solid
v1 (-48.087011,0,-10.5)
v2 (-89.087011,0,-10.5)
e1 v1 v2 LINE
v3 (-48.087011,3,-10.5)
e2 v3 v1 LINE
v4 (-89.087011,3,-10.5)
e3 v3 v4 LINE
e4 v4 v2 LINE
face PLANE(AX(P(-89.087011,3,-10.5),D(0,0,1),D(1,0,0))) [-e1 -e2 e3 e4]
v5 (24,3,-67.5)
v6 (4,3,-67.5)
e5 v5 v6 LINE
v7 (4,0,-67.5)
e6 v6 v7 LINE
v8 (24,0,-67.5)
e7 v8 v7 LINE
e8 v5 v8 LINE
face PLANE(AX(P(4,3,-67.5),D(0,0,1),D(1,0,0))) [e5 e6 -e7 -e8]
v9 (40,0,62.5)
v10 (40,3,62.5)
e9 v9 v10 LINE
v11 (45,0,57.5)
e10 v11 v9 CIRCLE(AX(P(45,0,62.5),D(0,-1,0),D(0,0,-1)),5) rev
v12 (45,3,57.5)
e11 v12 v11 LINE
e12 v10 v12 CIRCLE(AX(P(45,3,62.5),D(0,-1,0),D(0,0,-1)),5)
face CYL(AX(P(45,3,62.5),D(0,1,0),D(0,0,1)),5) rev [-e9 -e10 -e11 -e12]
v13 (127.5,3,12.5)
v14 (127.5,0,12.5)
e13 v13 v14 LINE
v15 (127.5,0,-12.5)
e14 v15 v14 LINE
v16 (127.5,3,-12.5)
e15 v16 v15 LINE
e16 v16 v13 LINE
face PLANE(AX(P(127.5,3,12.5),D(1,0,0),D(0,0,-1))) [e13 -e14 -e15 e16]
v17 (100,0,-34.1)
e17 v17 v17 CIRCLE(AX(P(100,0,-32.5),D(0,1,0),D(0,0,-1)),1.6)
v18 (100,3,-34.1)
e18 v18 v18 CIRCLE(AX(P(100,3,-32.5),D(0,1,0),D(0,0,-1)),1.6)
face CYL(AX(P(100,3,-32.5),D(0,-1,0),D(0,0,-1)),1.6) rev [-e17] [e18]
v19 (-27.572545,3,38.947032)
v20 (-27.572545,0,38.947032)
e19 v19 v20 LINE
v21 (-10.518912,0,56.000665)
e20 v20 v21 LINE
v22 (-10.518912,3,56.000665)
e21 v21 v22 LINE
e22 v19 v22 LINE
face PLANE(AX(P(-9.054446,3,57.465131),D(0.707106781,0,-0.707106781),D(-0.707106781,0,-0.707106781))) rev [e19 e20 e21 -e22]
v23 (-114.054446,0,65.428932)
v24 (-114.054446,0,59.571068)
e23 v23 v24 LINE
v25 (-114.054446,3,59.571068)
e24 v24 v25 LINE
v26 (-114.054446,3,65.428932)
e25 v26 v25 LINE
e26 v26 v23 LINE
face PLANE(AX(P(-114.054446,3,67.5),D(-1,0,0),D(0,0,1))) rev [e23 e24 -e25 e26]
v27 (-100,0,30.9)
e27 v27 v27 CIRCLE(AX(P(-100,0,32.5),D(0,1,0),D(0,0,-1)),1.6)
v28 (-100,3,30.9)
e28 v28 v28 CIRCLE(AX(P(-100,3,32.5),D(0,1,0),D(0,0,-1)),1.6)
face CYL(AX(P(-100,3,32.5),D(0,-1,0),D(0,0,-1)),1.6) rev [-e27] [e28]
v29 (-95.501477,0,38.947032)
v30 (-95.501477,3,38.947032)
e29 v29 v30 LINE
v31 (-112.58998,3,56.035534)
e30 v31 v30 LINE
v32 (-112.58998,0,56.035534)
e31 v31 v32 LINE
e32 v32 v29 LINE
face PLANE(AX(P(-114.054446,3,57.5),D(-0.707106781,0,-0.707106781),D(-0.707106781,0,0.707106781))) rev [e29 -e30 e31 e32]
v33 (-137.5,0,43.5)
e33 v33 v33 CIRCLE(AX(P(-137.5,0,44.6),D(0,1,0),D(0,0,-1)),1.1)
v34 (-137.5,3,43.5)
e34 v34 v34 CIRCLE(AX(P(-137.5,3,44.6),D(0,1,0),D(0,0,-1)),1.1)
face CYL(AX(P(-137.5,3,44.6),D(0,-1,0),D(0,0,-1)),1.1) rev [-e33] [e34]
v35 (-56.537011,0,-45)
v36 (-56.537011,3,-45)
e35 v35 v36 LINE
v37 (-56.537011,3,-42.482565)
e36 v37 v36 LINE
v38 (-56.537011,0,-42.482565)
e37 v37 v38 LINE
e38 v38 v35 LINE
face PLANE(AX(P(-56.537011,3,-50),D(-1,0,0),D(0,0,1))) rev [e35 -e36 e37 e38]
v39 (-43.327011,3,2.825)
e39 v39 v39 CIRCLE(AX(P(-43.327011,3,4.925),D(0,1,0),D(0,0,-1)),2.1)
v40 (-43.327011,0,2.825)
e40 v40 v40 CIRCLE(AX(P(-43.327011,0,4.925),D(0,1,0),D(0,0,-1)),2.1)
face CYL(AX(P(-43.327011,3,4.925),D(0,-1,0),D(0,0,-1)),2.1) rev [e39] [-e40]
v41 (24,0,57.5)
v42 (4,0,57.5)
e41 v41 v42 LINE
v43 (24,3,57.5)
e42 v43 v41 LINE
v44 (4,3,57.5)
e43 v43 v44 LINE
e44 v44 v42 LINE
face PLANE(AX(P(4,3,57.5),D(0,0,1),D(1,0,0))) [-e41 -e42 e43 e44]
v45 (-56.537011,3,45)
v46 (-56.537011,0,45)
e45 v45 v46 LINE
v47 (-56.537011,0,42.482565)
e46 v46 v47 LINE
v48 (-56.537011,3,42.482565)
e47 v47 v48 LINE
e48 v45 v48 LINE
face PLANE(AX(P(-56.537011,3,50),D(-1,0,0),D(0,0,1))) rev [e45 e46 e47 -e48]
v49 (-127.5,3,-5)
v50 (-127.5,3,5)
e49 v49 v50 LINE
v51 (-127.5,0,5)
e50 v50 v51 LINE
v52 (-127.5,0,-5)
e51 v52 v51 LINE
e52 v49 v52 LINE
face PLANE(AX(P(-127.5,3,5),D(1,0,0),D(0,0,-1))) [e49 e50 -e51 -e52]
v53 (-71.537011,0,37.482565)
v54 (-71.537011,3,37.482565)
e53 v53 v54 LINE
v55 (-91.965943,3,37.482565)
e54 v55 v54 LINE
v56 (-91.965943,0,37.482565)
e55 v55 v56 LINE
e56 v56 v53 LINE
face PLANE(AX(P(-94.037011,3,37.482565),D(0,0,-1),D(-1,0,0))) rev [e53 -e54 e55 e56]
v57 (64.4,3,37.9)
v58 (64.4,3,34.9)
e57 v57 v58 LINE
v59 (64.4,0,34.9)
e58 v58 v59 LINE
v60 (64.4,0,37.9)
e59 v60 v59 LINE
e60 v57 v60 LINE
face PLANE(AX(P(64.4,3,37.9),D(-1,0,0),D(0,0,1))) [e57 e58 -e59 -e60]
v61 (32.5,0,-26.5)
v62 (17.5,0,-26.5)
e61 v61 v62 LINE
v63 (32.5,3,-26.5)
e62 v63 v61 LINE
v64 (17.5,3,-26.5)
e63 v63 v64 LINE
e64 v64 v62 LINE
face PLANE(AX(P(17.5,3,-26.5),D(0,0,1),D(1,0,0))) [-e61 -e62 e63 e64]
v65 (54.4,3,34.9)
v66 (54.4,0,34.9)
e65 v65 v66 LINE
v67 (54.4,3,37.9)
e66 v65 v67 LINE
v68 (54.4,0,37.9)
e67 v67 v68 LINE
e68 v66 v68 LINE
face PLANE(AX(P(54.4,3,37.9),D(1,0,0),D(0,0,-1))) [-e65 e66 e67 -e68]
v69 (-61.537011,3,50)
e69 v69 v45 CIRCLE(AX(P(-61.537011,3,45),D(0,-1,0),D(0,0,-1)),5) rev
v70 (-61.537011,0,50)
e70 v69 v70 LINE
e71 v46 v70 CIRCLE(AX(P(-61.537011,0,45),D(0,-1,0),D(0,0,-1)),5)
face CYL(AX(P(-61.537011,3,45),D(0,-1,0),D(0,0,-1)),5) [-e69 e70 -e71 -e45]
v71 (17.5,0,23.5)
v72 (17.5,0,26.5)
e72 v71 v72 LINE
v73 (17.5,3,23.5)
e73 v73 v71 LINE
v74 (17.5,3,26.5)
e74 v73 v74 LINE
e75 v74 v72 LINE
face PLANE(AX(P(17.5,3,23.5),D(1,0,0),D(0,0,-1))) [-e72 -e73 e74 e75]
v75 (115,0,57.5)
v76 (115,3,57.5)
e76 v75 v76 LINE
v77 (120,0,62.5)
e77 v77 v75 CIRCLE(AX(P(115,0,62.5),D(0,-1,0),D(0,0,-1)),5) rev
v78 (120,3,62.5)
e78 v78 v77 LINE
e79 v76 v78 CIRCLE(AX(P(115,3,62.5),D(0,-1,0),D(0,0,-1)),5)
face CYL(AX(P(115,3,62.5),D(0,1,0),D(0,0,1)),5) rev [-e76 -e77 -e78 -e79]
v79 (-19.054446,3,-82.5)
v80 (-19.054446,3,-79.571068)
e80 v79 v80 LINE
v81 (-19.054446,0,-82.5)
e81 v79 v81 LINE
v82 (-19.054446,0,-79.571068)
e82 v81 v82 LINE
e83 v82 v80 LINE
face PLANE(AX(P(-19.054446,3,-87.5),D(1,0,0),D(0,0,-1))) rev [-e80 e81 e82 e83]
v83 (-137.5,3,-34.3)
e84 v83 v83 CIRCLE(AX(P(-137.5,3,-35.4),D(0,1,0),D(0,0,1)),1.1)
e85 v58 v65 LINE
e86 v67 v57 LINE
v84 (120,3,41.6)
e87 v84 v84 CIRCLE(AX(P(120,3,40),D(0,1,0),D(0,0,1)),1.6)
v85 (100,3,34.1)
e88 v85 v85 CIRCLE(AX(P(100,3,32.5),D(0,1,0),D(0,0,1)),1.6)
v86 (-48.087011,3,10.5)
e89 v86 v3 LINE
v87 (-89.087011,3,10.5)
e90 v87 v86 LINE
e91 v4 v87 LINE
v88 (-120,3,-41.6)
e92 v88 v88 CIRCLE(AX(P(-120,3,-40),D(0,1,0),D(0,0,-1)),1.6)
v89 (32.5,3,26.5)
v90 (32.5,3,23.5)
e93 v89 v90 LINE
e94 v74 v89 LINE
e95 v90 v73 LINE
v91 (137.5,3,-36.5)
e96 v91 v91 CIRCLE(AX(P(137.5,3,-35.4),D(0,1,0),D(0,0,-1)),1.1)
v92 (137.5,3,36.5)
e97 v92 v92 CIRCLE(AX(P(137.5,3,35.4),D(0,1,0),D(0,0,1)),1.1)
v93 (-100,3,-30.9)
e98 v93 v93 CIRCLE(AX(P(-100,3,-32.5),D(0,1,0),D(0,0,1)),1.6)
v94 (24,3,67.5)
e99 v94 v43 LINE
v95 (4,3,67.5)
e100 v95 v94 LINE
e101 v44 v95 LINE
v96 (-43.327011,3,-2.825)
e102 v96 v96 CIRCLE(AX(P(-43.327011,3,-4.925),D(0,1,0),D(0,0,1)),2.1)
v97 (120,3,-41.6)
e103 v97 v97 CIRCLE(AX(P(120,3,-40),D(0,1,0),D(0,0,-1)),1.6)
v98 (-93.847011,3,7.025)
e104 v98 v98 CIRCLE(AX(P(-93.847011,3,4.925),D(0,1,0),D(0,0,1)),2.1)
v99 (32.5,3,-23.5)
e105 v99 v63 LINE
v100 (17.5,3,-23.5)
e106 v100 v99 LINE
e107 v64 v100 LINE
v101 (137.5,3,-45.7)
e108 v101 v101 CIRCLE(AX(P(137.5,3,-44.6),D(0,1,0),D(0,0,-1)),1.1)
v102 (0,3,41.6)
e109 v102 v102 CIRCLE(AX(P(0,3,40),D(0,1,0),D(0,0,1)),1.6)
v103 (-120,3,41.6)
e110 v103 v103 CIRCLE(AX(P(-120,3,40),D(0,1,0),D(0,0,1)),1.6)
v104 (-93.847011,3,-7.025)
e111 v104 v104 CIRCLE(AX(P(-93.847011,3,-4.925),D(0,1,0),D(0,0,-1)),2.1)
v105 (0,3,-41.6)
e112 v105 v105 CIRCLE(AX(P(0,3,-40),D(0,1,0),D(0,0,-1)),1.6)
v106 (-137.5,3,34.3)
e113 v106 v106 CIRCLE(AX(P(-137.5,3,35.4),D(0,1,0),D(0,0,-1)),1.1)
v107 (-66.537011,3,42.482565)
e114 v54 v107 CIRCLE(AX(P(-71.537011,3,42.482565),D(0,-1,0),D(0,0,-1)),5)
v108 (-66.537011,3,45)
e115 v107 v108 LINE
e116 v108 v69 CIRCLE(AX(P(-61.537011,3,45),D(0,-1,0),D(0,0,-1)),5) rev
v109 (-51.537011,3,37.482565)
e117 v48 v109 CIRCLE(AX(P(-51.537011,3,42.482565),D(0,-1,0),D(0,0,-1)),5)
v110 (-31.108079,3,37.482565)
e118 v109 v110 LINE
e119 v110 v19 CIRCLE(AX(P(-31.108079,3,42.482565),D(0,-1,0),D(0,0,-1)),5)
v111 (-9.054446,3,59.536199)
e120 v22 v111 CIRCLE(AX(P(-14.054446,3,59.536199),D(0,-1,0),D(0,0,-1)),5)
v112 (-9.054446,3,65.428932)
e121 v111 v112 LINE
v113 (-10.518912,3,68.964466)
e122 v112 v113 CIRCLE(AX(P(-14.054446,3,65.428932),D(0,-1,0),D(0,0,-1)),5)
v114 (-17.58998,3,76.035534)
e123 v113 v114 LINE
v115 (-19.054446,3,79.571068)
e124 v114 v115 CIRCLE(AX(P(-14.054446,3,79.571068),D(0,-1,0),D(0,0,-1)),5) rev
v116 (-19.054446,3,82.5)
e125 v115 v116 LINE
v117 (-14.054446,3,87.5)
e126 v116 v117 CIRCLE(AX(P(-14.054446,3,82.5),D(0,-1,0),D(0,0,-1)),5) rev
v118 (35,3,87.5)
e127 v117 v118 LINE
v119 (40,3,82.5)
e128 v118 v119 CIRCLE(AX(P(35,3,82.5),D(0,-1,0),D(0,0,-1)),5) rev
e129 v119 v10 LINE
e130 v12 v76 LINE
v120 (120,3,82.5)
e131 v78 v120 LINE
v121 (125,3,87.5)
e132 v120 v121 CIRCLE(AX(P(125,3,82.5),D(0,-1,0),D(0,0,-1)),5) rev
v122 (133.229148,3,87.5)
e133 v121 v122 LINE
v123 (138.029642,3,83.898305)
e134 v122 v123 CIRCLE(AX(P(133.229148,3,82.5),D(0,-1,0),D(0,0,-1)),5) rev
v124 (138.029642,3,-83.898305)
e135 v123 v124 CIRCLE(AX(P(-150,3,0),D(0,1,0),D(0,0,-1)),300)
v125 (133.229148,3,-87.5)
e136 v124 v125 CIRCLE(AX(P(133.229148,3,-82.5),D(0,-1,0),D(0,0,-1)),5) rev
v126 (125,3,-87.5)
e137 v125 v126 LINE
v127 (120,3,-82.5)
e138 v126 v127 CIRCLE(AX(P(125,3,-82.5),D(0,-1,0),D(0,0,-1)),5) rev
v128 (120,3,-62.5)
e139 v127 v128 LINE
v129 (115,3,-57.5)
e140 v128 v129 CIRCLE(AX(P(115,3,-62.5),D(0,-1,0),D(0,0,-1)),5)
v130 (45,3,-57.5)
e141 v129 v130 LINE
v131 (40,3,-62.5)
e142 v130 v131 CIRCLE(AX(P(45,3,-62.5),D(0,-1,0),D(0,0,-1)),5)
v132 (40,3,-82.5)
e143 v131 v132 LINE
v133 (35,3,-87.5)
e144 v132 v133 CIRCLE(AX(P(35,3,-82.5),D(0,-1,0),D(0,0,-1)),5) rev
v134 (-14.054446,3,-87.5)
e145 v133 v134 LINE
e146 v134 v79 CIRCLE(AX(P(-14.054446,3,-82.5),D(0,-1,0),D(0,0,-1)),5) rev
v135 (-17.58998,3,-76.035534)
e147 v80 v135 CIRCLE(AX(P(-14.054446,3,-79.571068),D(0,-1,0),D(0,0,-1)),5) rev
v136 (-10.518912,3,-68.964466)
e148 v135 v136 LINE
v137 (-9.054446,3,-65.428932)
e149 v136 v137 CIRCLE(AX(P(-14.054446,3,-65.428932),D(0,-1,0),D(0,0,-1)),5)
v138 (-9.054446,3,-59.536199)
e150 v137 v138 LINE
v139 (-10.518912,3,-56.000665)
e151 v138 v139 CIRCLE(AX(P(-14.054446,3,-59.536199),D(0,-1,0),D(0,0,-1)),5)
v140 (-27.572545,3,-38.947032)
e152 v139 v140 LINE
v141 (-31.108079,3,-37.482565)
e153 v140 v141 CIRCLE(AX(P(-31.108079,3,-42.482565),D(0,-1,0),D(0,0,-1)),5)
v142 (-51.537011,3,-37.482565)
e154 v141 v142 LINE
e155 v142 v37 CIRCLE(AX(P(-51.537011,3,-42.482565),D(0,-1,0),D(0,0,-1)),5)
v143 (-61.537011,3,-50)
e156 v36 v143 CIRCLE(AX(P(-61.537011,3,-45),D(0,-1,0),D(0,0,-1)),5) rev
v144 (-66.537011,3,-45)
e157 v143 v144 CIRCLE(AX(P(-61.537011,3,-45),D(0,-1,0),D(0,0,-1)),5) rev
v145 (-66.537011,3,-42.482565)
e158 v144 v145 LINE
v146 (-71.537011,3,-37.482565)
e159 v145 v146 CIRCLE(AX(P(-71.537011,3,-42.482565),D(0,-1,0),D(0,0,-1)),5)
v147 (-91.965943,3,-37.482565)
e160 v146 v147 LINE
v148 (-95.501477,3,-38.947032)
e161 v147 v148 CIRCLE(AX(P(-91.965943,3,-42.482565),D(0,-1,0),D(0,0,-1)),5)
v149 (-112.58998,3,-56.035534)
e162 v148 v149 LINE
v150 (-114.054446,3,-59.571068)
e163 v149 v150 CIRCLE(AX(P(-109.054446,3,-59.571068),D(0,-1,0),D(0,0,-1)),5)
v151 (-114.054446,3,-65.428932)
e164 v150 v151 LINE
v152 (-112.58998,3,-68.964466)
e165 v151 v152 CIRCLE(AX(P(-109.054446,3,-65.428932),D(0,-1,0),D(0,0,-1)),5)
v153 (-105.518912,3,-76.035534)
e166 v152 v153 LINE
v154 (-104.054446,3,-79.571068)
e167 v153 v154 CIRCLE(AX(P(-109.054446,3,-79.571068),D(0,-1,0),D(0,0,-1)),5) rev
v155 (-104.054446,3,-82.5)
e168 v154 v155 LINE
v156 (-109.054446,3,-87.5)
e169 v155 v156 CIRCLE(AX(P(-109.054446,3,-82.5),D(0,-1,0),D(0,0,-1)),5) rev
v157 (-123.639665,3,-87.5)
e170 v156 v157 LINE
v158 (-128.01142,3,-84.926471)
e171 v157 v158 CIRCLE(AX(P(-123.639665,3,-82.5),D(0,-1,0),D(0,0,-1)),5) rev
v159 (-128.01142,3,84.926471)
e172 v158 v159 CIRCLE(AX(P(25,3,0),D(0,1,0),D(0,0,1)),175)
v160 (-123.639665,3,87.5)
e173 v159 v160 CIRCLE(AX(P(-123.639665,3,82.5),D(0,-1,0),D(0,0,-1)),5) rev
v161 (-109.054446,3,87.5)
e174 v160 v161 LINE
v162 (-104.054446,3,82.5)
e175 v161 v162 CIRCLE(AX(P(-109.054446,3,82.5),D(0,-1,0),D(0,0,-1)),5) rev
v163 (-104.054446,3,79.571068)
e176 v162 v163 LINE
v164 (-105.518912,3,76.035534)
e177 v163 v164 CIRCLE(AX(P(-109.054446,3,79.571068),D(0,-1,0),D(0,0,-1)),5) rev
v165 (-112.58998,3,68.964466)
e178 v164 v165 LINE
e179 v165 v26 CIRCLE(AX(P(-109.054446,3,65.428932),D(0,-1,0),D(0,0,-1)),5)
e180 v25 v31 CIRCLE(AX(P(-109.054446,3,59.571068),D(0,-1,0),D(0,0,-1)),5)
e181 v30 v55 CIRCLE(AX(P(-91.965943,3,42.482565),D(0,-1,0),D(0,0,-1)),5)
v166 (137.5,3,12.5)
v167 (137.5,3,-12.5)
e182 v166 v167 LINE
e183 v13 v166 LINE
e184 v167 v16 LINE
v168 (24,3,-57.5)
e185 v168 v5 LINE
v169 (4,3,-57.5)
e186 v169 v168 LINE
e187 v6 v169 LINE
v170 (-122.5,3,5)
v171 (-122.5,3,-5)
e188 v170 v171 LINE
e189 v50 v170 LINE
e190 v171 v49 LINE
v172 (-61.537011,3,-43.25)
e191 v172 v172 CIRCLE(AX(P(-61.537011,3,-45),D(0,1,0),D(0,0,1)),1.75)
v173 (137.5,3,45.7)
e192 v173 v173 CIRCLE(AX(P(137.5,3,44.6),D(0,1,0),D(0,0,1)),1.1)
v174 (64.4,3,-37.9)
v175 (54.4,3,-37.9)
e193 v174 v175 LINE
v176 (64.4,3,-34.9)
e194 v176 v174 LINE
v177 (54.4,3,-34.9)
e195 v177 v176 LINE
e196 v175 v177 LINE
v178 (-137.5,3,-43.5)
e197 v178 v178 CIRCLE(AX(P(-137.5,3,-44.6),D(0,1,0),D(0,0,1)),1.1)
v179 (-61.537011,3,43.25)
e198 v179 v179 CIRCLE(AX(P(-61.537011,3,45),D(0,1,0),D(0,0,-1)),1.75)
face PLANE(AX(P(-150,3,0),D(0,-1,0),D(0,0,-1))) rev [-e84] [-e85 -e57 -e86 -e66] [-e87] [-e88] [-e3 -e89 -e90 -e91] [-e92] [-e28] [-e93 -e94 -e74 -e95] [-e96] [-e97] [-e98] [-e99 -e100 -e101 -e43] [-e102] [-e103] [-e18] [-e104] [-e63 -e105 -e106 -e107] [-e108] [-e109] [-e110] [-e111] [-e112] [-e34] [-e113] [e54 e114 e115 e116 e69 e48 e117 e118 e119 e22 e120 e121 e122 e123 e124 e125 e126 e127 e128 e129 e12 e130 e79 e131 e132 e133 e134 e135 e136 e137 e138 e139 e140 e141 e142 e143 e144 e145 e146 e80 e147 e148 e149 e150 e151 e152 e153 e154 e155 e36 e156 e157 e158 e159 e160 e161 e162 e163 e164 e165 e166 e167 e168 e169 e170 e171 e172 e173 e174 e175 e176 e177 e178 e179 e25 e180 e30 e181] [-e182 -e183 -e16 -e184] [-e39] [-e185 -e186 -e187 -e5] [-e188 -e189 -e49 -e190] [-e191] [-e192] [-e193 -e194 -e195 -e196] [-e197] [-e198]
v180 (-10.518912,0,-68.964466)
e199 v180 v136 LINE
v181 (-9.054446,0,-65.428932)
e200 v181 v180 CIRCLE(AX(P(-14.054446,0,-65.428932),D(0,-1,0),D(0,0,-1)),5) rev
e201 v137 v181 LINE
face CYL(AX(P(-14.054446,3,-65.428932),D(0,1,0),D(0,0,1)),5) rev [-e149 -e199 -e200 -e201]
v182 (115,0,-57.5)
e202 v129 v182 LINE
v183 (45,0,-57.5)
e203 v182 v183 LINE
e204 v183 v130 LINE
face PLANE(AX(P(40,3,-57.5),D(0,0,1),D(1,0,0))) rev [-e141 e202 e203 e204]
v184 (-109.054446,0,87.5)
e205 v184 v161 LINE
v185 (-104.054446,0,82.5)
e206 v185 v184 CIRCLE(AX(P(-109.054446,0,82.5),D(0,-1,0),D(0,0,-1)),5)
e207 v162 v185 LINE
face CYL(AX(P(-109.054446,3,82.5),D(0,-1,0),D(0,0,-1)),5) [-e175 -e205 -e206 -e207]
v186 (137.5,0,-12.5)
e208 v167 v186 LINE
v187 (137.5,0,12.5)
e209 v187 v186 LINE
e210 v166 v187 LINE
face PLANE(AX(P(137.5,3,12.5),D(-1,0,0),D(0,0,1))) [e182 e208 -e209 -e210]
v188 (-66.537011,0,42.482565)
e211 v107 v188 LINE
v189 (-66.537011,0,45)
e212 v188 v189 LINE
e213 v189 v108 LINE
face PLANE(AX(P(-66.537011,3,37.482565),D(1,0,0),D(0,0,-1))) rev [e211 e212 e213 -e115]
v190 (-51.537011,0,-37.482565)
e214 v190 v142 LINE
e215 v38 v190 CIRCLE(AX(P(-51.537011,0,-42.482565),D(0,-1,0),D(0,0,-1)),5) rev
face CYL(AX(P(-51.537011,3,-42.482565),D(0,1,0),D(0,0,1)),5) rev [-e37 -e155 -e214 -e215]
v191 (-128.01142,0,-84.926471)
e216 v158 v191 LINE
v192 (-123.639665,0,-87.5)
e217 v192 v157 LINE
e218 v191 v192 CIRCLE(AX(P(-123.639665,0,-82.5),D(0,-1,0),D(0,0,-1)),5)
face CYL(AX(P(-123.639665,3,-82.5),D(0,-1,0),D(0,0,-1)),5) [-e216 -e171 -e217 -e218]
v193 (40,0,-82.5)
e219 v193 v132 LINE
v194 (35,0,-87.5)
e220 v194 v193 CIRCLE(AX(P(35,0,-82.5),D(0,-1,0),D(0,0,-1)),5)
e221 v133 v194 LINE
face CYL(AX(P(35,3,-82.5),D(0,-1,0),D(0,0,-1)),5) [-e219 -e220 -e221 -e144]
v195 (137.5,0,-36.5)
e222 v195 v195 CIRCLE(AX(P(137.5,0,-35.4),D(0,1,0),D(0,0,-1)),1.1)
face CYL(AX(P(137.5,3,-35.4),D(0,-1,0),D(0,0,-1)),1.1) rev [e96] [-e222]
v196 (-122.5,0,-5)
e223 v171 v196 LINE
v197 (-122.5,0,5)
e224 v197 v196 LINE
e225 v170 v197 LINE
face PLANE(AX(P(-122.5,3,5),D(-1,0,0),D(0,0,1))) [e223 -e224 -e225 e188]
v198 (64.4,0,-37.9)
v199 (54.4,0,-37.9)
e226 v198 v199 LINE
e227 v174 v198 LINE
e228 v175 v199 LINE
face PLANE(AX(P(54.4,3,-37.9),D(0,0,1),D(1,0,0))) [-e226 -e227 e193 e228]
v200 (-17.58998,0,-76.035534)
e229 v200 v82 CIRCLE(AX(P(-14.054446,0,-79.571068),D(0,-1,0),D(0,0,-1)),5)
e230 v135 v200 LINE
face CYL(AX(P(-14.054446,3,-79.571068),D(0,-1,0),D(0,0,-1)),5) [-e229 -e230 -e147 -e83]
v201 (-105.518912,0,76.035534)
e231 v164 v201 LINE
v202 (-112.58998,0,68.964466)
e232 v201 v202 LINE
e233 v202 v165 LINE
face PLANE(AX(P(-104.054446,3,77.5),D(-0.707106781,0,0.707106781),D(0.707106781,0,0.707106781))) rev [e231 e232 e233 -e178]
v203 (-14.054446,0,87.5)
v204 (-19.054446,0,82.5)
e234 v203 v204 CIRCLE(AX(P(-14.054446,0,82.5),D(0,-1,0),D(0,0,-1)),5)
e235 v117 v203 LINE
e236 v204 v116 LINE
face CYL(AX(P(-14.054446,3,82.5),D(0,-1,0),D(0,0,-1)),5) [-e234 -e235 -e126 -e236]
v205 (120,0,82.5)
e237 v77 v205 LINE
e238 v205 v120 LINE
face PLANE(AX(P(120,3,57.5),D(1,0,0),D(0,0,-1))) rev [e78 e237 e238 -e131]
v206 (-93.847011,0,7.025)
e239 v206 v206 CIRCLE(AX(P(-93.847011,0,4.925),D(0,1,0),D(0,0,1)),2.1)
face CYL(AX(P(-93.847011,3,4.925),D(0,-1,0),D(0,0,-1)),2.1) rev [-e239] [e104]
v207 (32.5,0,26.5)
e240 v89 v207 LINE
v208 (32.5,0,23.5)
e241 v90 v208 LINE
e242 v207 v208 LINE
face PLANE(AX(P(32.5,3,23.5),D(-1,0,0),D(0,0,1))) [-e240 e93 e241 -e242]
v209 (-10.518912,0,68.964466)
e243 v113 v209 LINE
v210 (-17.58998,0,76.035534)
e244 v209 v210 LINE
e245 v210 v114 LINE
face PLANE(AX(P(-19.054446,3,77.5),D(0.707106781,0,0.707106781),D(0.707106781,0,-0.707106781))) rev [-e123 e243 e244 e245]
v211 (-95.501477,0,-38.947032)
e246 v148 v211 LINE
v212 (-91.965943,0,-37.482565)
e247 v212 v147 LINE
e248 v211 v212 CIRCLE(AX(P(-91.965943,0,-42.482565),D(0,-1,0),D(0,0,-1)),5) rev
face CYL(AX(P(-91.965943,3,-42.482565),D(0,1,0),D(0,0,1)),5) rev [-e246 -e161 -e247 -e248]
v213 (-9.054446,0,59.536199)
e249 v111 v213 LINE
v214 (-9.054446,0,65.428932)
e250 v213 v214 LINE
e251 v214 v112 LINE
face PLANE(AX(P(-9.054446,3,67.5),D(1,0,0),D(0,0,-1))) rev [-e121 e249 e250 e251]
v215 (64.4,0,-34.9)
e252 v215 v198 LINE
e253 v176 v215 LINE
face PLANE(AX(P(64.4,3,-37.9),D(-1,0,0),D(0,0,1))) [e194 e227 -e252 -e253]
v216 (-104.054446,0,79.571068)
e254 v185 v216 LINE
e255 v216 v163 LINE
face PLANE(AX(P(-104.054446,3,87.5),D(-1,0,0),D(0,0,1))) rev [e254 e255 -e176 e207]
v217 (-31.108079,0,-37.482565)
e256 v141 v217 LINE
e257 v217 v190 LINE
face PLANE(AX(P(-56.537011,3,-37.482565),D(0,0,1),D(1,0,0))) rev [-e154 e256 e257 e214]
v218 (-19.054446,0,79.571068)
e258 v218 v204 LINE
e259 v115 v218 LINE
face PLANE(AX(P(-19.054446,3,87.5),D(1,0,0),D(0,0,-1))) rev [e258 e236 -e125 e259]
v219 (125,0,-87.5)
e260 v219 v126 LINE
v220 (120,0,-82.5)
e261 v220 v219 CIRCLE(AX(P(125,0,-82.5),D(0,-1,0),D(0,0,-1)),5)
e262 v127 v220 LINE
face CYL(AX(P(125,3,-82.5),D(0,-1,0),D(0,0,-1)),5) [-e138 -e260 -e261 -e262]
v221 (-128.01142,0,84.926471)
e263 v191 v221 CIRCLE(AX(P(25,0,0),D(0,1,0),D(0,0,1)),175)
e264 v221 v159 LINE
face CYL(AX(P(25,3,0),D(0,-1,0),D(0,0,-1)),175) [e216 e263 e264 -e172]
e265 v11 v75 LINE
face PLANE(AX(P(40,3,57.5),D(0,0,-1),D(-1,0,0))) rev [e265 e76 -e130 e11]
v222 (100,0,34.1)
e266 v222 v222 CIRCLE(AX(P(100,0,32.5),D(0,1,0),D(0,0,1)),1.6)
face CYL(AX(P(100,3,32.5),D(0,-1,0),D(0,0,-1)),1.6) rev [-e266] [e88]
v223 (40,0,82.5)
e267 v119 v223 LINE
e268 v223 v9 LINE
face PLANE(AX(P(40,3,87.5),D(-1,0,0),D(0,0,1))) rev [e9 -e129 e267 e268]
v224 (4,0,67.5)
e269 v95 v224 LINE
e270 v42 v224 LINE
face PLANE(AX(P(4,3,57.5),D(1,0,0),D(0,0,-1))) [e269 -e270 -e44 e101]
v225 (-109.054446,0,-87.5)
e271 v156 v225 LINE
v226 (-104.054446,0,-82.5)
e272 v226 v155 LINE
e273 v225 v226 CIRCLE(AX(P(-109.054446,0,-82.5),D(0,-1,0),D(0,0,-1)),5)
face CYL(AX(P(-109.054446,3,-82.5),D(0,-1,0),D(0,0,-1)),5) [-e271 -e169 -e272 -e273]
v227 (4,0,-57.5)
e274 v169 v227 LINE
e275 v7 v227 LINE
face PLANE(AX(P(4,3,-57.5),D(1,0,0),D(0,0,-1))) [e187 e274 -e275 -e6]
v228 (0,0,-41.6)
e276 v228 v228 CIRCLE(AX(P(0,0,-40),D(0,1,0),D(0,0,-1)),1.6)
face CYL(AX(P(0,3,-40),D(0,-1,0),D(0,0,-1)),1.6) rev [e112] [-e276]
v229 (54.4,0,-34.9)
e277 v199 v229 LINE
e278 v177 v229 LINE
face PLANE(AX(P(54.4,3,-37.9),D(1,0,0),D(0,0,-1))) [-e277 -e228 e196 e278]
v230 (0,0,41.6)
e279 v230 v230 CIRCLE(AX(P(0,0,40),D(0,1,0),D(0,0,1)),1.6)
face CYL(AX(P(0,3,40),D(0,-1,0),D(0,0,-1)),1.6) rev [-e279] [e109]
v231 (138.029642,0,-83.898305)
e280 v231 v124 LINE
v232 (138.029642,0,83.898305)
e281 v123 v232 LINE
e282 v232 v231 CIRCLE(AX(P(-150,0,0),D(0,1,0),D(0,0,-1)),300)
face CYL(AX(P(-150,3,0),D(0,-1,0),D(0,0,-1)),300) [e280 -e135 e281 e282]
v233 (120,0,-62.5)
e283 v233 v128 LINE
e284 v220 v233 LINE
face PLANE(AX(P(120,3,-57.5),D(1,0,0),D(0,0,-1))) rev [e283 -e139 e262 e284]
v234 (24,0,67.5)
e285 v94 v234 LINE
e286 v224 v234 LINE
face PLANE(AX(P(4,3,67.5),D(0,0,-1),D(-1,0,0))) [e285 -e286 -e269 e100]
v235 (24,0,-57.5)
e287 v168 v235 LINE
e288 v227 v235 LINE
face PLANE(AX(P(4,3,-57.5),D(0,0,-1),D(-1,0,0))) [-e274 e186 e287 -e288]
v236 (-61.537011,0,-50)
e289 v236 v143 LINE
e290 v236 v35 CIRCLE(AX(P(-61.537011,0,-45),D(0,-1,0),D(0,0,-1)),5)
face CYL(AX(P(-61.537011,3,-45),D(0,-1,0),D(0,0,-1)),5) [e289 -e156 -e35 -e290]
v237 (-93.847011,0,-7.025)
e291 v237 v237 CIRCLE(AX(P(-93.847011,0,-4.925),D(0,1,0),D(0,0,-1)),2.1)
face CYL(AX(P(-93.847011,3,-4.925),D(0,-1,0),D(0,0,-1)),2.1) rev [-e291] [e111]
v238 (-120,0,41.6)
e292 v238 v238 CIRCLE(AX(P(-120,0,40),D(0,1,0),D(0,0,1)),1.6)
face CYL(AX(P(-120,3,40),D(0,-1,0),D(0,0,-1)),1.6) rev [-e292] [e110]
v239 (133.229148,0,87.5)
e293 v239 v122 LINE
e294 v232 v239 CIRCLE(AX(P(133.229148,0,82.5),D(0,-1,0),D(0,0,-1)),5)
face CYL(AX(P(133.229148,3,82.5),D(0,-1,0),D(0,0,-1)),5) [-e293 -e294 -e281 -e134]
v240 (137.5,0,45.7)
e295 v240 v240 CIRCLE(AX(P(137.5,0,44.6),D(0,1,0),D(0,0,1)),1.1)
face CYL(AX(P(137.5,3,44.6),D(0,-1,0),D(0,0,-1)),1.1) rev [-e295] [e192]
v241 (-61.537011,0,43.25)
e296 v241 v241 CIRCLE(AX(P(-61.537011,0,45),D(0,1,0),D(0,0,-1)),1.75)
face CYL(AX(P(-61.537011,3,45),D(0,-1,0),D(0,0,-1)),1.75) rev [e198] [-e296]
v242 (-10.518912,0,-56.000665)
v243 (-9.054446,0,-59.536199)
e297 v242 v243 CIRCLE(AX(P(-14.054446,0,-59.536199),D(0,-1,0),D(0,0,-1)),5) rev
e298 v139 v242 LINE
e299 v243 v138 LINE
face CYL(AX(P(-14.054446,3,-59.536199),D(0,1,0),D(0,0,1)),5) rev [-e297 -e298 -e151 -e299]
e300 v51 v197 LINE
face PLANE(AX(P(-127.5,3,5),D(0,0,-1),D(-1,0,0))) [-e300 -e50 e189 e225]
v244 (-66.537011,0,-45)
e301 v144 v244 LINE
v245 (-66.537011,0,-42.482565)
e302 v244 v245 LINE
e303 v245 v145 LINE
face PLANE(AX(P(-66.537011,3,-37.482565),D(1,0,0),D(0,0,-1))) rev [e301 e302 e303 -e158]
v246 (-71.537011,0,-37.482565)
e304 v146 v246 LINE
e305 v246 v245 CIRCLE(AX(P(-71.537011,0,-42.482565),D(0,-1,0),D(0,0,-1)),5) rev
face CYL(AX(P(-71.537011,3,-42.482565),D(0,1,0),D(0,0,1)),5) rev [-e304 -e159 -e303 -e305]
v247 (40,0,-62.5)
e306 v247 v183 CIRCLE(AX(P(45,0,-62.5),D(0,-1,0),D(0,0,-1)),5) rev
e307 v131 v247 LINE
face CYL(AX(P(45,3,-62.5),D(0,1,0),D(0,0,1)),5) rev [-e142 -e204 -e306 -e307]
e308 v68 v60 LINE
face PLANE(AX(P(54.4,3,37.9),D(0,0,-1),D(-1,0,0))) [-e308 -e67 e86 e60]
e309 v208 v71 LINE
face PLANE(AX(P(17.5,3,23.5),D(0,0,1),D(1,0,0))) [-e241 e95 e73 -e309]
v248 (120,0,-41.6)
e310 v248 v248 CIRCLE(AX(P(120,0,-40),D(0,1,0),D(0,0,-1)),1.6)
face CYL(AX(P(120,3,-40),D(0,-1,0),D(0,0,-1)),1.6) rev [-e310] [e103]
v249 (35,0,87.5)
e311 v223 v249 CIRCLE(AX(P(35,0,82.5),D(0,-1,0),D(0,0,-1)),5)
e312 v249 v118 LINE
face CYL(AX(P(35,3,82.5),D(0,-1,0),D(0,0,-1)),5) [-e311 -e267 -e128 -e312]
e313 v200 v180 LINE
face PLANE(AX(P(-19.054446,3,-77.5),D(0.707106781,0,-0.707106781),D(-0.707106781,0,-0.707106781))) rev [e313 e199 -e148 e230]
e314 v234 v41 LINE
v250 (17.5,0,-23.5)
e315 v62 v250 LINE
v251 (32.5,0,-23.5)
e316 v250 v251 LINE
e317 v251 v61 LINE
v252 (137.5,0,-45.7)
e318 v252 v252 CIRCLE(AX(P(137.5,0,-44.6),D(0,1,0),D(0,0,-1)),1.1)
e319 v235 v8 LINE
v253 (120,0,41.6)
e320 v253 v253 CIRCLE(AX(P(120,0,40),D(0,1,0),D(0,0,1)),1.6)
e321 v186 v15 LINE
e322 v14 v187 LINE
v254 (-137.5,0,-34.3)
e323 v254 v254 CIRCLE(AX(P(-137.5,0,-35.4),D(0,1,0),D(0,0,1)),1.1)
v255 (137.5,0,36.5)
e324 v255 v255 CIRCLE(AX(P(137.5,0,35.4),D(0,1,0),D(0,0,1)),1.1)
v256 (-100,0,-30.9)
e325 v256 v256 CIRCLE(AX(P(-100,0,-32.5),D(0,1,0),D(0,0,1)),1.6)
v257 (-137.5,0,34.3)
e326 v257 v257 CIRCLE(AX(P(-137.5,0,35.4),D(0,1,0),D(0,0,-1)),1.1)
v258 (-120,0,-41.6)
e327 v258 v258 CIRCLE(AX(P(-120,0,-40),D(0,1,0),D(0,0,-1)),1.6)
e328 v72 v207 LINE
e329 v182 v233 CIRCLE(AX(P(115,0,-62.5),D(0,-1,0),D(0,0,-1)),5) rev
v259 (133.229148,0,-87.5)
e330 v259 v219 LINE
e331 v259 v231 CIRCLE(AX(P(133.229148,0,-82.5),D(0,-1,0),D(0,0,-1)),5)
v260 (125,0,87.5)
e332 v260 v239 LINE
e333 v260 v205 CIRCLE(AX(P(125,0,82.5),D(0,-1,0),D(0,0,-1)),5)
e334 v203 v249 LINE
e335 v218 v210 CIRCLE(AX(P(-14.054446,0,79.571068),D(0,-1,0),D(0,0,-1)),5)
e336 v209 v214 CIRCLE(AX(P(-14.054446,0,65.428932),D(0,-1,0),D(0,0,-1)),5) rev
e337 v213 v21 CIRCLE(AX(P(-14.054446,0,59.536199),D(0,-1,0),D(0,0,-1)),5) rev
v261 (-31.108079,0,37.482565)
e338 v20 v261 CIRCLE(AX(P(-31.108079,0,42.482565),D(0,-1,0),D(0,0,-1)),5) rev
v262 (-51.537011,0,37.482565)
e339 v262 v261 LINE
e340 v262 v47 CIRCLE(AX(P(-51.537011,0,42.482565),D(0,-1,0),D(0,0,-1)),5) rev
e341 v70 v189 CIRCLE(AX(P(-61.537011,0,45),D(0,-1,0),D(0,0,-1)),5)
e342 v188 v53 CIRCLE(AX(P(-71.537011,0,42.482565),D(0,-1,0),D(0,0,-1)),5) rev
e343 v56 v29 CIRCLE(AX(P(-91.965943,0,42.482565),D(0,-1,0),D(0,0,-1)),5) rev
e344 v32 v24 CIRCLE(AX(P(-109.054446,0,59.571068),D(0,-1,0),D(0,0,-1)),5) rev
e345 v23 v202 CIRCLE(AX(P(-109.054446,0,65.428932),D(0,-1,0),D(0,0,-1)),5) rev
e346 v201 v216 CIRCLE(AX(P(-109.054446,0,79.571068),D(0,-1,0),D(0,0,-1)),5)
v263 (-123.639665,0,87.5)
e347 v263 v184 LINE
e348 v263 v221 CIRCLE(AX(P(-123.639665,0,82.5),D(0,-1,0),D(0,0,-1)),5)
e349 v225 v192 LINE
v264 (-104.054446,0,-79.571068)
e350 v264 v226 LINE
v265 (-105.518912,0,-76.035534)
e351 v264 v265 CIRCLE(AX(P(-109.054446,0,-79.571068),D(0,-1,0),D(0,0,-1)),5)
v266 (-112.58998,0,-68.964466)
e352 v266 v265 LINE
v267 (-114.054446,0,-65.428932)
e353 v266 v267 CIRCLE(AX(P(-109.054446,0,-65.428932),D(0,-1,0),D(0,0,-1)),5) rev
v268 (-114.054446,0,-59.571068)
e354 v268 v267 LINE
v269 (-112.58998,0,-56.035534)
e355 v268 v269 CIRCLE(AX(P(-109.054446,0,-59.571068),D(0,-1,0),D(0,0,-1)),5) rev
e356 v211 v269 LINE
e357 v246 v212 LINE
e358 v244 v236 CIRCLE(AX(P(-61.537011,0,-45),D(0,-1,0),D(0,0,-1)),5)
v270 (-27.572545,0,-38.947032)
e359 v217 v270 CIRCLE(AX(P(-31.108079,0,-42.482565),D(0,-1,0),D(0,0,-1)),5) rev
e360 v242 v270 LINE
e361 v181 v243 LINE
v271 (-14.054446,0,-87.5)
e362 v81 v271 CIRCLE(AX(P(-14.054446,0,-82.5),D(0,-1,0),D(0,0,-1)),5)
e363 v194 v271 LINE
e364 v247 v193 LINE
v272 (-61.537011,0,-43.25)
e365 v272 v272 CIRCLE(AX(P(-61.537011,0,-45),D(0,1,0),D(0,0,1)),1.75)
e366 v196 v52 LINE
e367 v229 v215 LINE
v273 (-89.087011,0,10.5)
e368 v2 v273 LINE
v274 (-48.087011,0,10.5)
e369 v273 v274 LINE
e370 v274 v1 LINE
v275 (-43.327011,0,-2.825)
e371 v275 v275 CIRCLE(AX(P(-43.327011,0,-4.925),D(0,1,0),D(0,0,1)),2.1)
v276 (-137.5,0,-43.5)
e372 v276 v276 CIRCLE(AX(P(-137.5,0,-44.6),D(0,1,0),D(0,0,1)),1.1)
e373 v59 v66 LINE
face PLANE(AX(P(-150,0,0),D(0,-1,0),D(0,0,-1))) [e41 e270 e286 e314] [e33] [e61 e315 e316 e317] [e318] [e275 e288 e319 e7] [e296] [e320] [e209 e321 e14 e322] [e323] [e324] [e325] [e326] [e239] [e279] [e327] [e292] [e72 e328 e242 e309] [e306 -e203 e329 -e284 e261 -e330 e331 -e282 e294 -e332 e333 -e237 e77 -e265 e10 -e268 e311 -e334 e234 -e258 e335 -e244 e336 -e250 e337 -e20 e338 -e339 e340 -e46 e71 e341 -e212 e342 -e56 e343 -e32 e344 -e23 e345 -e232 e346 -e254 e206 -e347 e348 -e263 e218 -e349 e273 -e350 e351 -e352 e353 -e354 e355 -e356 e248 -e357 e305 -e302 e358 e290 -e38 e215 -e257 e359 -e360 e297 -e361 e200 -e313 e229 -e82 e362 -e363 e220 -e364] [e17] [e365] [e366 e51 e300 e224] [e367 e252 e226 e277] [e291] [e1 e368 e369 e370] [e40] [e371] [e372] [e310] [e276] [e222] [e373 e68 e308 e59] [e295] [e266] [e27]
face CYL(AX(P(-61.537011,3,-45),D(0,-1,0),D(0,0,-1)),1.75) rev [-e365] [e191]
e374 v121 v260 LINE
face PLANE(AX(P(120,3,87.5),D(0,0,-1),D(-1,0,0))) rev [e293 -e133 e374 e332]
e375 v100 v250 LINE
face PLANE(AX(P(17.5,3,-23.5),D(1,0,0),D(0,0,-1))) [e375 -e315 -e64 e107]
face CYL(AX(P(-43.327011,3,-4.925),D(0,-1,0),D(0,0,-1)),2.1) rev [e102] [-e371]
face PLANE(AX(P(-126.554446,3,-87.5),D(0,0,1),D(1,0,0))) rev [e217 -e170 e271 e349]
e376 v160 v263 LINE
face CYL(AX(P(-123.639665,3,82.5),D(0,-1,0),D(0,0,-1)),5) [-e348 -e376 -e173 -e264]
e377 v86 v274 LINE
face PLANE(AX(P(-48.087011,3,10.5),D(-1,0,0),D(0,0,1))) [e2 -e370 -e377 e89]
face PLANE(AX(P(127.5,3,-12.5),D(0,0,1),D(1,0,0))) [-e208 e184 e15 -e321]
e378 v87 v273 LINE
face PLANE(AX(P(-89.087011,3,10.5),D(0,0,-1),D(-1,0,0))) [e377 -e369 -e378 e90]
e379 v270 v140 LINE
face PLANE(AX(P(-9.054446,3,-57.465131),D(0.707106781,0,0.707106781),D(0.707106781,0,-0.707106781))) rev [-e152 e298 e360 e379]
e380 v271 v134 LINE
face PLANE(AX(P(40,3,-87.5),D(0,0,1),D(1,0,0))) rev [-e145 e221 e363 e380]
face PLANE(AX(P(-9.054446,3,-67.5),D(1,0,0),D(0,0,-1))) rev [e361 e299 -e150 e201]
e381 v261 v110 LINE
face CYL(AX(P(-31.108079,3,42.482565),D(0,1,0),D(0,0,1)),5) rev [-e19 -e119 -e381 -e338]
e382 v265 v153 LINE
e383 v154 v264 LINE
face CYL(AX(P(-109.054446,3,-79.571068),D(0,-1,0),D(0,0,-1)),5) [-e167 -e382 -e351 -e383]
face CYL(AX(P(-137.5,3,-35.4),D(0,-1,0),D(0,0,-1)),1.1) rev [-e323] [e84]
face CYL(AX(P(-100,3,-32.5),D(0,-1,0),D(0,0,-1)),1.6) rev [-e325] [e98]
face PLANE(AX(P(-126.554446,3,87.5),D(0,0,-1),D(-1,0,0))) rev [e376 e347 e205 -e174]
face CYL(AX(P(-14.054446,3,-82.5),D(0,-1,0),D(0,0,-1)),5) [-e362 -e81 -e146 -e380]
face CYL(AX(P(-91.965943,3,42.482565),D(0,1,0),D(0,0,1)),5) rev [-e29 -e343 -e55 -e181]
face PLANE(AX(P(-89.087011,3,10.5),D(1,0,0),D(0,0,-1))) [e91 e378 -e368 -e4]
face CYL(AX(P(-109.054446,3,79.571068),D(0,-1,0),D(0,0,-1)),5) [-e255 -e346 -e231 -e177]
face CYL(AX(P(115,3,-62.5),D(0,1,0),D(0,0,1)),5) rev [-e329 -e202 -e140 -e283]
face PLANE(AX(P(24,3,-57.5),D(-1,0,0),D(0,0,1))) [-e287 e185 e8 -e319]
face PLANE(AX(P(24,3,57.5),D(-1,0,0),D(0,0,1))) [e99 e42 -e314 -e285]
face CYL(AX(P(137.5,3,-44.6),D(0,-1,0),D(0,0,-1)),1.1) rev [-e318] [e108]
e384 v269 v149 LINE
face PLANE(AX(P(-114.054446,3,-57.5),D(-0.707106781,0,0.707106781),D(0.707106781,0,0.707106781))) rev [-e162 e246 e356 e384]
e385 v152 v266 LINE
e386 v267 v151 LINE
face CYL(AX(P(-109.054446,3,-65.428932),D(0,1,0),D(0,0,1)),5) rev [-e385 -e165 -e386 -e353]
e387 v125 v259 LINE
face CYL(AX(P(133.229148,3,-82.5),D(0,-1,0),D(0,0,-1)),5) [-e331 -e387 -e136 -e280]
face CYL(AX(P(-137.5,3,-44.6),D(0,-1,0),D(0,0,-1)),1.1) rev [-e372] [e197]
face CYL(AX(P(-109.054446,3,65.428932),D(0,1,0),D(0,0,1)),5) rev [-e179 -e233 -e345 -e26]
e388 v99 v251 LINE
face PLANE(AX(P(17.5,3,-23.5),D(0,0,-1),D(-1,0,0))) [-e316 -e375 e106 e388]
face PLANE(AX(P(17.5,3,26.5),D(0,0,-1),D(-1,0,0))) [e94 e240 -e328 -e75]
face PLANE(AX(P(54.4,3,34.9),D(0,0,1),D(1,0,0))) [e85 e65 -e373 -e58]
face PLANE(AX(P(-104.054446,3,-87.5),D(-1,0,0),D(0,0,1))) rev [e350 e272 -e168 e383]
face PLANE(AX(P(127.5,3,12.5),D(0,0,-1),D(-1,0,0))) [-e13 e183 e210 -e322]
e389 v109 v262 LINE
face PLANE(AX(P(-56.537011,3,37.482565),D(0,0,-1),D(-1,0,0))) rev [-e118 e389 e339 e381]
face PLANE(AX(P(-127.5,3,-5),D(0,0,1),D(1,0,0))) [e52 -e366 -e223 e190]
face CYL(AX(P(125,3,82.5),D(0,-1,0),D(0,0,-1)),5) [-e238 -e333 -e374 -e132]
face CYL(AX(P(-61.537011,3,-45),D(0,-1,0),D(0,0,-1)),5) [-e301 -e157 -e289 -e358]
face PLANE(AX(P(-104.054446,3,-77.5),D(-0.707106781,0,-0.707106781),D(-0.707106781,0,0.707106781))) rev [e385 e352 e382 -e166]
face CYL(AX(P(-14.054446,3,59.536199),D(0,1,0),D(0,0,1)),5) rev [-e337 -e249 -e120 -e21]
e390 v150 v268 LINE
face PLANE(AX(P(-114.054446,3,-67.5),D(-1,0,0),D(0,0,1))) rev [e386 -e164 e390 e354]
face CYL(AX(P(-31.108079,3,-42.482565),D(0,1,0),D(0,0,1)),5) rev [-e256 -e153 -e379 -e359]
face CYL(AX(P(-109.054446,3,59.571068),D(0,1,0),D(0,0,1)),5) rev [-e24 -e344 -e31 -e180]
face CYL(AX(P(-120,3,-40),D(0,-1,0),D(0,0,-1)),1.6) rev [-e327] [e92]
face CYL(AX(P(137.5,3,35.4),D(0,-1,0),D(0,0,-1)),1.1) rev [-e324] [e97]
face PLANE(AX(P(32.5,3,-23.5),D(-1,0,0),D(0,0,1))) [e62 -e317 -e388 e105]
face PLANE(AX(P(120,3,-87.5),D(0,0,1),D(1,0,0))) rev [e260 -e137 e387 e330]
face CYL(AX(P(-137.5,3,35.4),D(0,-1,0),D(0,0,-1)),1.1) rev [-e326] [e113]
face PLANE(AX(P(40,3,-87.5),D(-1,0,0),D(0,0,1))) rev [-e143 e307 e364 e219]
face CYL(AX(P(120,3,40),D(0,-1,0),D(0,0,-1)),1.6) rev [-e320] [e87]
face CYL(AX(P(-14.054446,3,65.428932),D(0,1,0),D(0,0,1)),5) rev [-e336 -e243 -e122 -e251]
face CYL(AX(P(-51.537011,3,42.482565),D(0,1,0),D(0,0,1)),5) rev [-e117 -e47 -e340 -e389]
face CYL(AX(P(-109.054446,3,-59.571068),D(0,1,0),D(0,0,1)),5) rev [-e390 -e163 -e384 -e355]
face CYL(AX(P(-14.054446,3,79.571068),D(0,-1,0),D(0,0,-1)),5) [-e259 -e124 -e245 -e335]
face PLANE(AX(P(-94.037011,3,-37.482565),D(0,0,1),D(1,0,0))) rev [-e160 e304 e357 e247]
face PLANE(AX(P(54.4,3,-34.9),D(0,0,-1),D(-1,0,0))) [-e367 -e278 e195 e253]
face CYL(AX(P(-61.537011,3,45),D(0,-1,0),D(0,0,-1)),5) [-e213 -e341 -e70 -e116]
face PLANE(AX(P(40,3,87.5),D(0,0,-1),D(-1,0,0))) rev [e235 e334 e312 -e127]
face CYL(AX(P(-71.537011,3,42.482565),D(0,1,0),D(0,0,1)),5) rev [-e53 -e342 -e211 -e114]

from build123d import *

# Parameters (mm, degrees)
SKETCH1_R           = 1.75
SKETCH1_R_2         = 1.6
SKETCH1_R_3         = 1.1
SKETCH1_R_4         = 2.1
SKETCH1_W           = 41
SKETCH1_H           = 21
SKETCH1_W_2         = 10
SKETCH1_H_2         = 3
SKETCH1_H_3         = 25
SKETCH1_W_3         = 15
SKETCH1_W_4         = 20
SKETCH1_H_4         = 10
SKETCH1_W_5         = 5
BOSS_EXTRUDE1_DEPTH = 3
FILLET1_R           = 5


with BuildPart() as part:
    # Sketch1 → Boss-Extrude1 (new body)
    with BuildSketch(Plane(origin=(0, 0, 0), x_dir=(1, 0, 0), z_dir=(0, 1, 0))):
        with BuildLine():
            Line((40, 87.5), (40, 57.5))
            Line((40, 57.5), (120, 57.5))
            Line((120, 57.5), (120, 87.5))
            Line((120, 87.5), (136.956007081, 87.5))
            ThreePointArc((136.956007081, 87.5), (150, 0), (136.956007081, -87.5))
            Line((136.956007081, -87.5), (120, -87.5))
            Line((120, -87.5), (120, -57.5))
            Line((120, -57.5), (40, -57.5))
            Line((40, -57.5), (40, -87.5))
            Line((40, -87.5), (-19.054445662, -87.5))
            Line((-19.054445662, -87.5), (-19.054445662, -77.5))
            Line((-19.054445662, -77.5), (-9.054445662, -67.5))
            Line((-9.054445662, -67.5), (-9.054445662, -57.465130862))
            Line((-9.054445662, -57.465130862), (-29.037011093, -37.482565431))
            Line((-29.037011093, -37.482565431), (-56.537011093, -37.482565431))
            Line((-56.537011093, -37.482565431), (-56.537011093, -50))
            Line((-56.537011093, -50), (-66.537011093, -50))
            Line((-66.537011093, -50), (-66.537011093, -37.482565431))
            Line((-66.537011093, -37.482565431), (-94.037011093, -37.482565431))
            Line((-94.037011093, -37.482565431), (-114.054445662, -57.5))
            Line((-114.054445662, -57.5), (-114.054445662, -67.5))
            Line((-114.054445662, -67.5), (-104.054445662, -77.5))
            Line((-104.054445662, -77.5), (-104.054445662, -87.5))
            Line((-104.054445662, -87.5), (-126.554445662, -87.5))
            ThreePointArc((-126.554445662, -87.5), (-150, 0), (-126.554445662, 87.5))
            Line((-126.554445662, 87.5), (-104.054445662, 87.5))
            Line((-104.054445662, 87.5), (-104.054445662, 77.5))
            Line((-104.054445662, 77.5), (-114.054445662, 67.5))
            Line((-114.054445662, 67.5), (-114.054445662, 57.5))
            Line((-114.054445662, 57.5), (-94.037011093, 37.482565431))
            Line((-94.037011093, 37.482565431), (-66.537011093, 37.482565431))
            Line((-66.537011093, 37.482565431), (-66.537011093, 50))
            Line((-66.537011093, 50), (-56.537011093, 50))
            Line((-56.537011093, 50), (-56.537011093, 37.482565431))
            Line((-56.537011093, 37.482565431), (-29.037011093, 37.482565431))
            Line((-29.037011093, 37.482565431), (-9.054445662, 57.465130862))
            Line((-9.054445662, 57.465130862), (-9.054445662, 67.5))
            Line((-9.054445662, 67.5), (-19.054445662, 77.5))
            Line((-19.054445662, 77.5), (-19.054445662, 87.5))
            Line((-19.054445662, 87.5), (40, 87.5))
        make_face()
        with Locations(Location((-61.537011093, 45, 0), (0, 0, 270))):
            Circle(SKETCH1_R, mode=Mode.SUBTRACT)
        with Locations(Location((-61.537011093, -45, 0), (0, 0, 90))):
            Circle(SKETCH1_R, mode=Mode.SUBTRACT)
        with Locations(Location((-100, 32.5, 0), (0, 0, 270))):
            Circle(SKETCH1_R_2, mode=Mode.SUBTRACT)
        with Locations(Location((100, 32.5, 0), (0, 0, 90))):
            Circle(SKETCH1_R_2, mode=Mode.SUBTRACT)
        with Locations(Location((100, -32.5, 0), (0, 0, 270))):
            Circle(SKETCH1_R_2, mode=Mode.SUBTRACT)
        with Locations(Location((-100, -32.5, 0), (0, 0, 90))):
            Circle(SKETCH1_R_2, mode=Mode.SUBTRACT)
        with Locations(Location((-120, -40, 0), (0, 0, 270))):
            Circle(SKETCH1_R_2, mode=Mode.SUBTRACT)
        with Locations(Location((0, -40, 0), (0, 0, 270))):
            Circle(SKETCH1_R_2, mode=Mode.SUBTRACT)
        with Locations(Location((120, -40, 0), (0, 0, 270))):
            Circle(SKETCH1_R_2, mode=Mode.SUBTRACT)
        with Locations(Location((120, 40, 0), (0, 0, 90))):
            Circle(SKETCH1_R_2, mode=Mode.SUBTRACT)
        with Locations(Location((0, 40, 0), (0, 0, 90))):
            Circle(SKETCH1_R_2, mode=Mode.SUBTRACT)
        with Locations(Location((-120, 40, 0), (0, 0, 90))):
            Circle(SKETCH1_R_2, mode=Mode.SUBTRACT)
        with Locations(Location((-137.5, 35.4, 0), (0, 0, 270))):
            Circle(SKETCH1_R_3, mode=Mode.SUBTRACT)
        with Locations(Location((-93.847011093, -4.925, 0), (0, 0, 270))):
            Circle(SKETCH1_R_4, mode=Mode.SUBTRACT)
        with Locations(Location((-93.847011093, 4.925, 0), (0, 0, 90))):
            Circle(SKETCH1_R_4, mode=Mode.SUBTRACT)
        with Locations(Location((-43.327011093, -4.925, 0), (0, 0, 90))):
            Circle(SKETCH1_R_4, mode=Mode.SUBTRACT)
        with Locations(Location((-43.327011093, 4.925, 0), (0, 0, 270))):
            Circle(SKETCH1_R_4, mode=Mode.SUBTRACT)
        with Locations(Location((-137.5, 44.6, 0), (0, 0, 270))):
            Circle(SKETCH1_R_3, mode=Mode.SUBTRACT)
        with Locations(Location((-137.5, -35.4, 0), (0, 0, 90))):
            Circle(SKETCH1_R_3, mode=Mode.SUBTRACT)
        with Locations(Location((-137.5, -44.6, 0), (0, 0, 90))):
            Circle(SKETCH1_R_3, mode=Mode.SUBTRACT)
        with Locations(Location((137.5, 35.4, 0), (0, 0, 90))):
            Circle(SKETCH1_R_3, mode=Mode.SUBTRACT)
        with Locations(Location((137.5, 44.6, 0), (0, 0, 90))):
            Circle(SKETCH1_R_3, mode=Mode.SUBTRACT)
        with Locations(Location((137.5, -35.4, 0), (0, 0, 270))):
            Circle(SKETCH1_R_3, mode=Mode.SUBTRACT)
        with Locations(Location((137.5, -44.6, 0), (0, 0, 270))):
            Circle(SKETCH1_R_3, mode=Mode.SUBTRACT)
        with Locations((-68.587011093, 0)):
            Rectangle(SKETCH1_W, SKETCH1_H, mode=Mode.SUBTRACT)
        with Locations((59.4, 36.4)):
            Rectangle(SKETCH1_W_2, SKETCH1_H_2, mode=Mode.SUBTRACT)
        with Locations((59.4, -36.4)):
            Rectangle(SKETCH1_W_2, SKETCH1_H_2, mode=Mode.SUBTRACT)
        with Locations((132.5, 0)):
            Rectangle(SKETCH1_W_2, SKETCH1_H_3, mode=Mode.SUBTRACT)
        with Locations((25, 25)):
            Rectangle(SKETCH1_W_3, SKETCH1_H_2, mode=Mode.SUBTRACT)
        with Locations((25, -25)):
            Rectangle(SKETCH1_W_3, SKETCH1_H_2, mode=Mode.SUBTRACT)
        with Locations((14, 62.5)):
            Rectangle(SKETCH1_W_4, SKETCH1_H_4, mode=Mode.SUBTRACT)
        with Locations((14, -62.5)):
            Rectangle(SKETCH1_W_4, SKETCH1_H_4, mode=Mode.SUBTRACT)
        with Locations((-125, 0)):
            Rectangle(SKETCH1_W_5, SKETCH1_H_4, mode=Mode.SUBTRACT)
    extrude(amount=BOSS_EXTRUDE1_DEPTH)

    # Fillet1
    fillet1_edges = [part.edges().sort_by_distance(p)[0] for p in [
        (120, 1.5, 57.5),
        (120, 1.5, -57.5),
        (40, 1.5, -57.5),
        (40, 1.5, -87.5),
        (-19.054445662, 1.5, -87.5),
        (40, 1.5, 57.5),
        (-56.537011093, 1.5, 37.482565431),
        (-56.537011093, 1.5, 50),
        (-66.537011093, 1.5, 50),
        (-66.537011093, 1.5, 37.482565431),
        (-56.537011093, 1.5, -37.482565431),
        (-56.537011093, 1.5, -50),
        (-66.537011093, 1.5, -50),
        (-66.537011093, 1.5, -37.482565431),
        (-94.037011093, 1.5, -37.482565431),
        (-126.554445662, 1.5, -87.5),
        (-126.554445662, 1.5, 87.5),
        (40, 1.5, 87.5),
        (-19.054445662, 1.5, 87.5),
        (-19.054445662, 1.5, 77.5),
        (-9.054445662, 1.5, 67.5),
        (-9.054445662, 1.5, 57.465130862),
        (-29.037011093, 1.5, 37.482565431),
        (-94.037011093, 1.5, 37.482565431),
        (-114.054445662, 1.5, 67.5),
        (-114.054445662, 1.5, 57.5),
        (-104.054445662, 1.5, 77.5),
        (-104.054445662, 1.5, 87.5),
        (-19.054445662, 1.5, -77.5),
        (-9.054445662, 1.5, -67.5),
        (-9.054445662, 1.5, -57.465130862),
        (-29.037011093, 1.5, -37.482565431),
        (-114.054445662, 1.5, -57.5),
        (-114.054445662, 1.5, -67.5),
        (-104.054445662, 1.5, -77.5),
        (-104.054445662, 1.5, -87.5),
        (120, 1.5, -87.5),
        (136.956007081, 1.5, -87.5),
        (136.956007081, 1.5, 87.5),
        (120, 1.5, 87.5),
    ]]
    fillet(fillet1_edges, radius=FILLET1_R - 0.0001)  # a hair under: the kernel refuses the full size


solid = part.part
